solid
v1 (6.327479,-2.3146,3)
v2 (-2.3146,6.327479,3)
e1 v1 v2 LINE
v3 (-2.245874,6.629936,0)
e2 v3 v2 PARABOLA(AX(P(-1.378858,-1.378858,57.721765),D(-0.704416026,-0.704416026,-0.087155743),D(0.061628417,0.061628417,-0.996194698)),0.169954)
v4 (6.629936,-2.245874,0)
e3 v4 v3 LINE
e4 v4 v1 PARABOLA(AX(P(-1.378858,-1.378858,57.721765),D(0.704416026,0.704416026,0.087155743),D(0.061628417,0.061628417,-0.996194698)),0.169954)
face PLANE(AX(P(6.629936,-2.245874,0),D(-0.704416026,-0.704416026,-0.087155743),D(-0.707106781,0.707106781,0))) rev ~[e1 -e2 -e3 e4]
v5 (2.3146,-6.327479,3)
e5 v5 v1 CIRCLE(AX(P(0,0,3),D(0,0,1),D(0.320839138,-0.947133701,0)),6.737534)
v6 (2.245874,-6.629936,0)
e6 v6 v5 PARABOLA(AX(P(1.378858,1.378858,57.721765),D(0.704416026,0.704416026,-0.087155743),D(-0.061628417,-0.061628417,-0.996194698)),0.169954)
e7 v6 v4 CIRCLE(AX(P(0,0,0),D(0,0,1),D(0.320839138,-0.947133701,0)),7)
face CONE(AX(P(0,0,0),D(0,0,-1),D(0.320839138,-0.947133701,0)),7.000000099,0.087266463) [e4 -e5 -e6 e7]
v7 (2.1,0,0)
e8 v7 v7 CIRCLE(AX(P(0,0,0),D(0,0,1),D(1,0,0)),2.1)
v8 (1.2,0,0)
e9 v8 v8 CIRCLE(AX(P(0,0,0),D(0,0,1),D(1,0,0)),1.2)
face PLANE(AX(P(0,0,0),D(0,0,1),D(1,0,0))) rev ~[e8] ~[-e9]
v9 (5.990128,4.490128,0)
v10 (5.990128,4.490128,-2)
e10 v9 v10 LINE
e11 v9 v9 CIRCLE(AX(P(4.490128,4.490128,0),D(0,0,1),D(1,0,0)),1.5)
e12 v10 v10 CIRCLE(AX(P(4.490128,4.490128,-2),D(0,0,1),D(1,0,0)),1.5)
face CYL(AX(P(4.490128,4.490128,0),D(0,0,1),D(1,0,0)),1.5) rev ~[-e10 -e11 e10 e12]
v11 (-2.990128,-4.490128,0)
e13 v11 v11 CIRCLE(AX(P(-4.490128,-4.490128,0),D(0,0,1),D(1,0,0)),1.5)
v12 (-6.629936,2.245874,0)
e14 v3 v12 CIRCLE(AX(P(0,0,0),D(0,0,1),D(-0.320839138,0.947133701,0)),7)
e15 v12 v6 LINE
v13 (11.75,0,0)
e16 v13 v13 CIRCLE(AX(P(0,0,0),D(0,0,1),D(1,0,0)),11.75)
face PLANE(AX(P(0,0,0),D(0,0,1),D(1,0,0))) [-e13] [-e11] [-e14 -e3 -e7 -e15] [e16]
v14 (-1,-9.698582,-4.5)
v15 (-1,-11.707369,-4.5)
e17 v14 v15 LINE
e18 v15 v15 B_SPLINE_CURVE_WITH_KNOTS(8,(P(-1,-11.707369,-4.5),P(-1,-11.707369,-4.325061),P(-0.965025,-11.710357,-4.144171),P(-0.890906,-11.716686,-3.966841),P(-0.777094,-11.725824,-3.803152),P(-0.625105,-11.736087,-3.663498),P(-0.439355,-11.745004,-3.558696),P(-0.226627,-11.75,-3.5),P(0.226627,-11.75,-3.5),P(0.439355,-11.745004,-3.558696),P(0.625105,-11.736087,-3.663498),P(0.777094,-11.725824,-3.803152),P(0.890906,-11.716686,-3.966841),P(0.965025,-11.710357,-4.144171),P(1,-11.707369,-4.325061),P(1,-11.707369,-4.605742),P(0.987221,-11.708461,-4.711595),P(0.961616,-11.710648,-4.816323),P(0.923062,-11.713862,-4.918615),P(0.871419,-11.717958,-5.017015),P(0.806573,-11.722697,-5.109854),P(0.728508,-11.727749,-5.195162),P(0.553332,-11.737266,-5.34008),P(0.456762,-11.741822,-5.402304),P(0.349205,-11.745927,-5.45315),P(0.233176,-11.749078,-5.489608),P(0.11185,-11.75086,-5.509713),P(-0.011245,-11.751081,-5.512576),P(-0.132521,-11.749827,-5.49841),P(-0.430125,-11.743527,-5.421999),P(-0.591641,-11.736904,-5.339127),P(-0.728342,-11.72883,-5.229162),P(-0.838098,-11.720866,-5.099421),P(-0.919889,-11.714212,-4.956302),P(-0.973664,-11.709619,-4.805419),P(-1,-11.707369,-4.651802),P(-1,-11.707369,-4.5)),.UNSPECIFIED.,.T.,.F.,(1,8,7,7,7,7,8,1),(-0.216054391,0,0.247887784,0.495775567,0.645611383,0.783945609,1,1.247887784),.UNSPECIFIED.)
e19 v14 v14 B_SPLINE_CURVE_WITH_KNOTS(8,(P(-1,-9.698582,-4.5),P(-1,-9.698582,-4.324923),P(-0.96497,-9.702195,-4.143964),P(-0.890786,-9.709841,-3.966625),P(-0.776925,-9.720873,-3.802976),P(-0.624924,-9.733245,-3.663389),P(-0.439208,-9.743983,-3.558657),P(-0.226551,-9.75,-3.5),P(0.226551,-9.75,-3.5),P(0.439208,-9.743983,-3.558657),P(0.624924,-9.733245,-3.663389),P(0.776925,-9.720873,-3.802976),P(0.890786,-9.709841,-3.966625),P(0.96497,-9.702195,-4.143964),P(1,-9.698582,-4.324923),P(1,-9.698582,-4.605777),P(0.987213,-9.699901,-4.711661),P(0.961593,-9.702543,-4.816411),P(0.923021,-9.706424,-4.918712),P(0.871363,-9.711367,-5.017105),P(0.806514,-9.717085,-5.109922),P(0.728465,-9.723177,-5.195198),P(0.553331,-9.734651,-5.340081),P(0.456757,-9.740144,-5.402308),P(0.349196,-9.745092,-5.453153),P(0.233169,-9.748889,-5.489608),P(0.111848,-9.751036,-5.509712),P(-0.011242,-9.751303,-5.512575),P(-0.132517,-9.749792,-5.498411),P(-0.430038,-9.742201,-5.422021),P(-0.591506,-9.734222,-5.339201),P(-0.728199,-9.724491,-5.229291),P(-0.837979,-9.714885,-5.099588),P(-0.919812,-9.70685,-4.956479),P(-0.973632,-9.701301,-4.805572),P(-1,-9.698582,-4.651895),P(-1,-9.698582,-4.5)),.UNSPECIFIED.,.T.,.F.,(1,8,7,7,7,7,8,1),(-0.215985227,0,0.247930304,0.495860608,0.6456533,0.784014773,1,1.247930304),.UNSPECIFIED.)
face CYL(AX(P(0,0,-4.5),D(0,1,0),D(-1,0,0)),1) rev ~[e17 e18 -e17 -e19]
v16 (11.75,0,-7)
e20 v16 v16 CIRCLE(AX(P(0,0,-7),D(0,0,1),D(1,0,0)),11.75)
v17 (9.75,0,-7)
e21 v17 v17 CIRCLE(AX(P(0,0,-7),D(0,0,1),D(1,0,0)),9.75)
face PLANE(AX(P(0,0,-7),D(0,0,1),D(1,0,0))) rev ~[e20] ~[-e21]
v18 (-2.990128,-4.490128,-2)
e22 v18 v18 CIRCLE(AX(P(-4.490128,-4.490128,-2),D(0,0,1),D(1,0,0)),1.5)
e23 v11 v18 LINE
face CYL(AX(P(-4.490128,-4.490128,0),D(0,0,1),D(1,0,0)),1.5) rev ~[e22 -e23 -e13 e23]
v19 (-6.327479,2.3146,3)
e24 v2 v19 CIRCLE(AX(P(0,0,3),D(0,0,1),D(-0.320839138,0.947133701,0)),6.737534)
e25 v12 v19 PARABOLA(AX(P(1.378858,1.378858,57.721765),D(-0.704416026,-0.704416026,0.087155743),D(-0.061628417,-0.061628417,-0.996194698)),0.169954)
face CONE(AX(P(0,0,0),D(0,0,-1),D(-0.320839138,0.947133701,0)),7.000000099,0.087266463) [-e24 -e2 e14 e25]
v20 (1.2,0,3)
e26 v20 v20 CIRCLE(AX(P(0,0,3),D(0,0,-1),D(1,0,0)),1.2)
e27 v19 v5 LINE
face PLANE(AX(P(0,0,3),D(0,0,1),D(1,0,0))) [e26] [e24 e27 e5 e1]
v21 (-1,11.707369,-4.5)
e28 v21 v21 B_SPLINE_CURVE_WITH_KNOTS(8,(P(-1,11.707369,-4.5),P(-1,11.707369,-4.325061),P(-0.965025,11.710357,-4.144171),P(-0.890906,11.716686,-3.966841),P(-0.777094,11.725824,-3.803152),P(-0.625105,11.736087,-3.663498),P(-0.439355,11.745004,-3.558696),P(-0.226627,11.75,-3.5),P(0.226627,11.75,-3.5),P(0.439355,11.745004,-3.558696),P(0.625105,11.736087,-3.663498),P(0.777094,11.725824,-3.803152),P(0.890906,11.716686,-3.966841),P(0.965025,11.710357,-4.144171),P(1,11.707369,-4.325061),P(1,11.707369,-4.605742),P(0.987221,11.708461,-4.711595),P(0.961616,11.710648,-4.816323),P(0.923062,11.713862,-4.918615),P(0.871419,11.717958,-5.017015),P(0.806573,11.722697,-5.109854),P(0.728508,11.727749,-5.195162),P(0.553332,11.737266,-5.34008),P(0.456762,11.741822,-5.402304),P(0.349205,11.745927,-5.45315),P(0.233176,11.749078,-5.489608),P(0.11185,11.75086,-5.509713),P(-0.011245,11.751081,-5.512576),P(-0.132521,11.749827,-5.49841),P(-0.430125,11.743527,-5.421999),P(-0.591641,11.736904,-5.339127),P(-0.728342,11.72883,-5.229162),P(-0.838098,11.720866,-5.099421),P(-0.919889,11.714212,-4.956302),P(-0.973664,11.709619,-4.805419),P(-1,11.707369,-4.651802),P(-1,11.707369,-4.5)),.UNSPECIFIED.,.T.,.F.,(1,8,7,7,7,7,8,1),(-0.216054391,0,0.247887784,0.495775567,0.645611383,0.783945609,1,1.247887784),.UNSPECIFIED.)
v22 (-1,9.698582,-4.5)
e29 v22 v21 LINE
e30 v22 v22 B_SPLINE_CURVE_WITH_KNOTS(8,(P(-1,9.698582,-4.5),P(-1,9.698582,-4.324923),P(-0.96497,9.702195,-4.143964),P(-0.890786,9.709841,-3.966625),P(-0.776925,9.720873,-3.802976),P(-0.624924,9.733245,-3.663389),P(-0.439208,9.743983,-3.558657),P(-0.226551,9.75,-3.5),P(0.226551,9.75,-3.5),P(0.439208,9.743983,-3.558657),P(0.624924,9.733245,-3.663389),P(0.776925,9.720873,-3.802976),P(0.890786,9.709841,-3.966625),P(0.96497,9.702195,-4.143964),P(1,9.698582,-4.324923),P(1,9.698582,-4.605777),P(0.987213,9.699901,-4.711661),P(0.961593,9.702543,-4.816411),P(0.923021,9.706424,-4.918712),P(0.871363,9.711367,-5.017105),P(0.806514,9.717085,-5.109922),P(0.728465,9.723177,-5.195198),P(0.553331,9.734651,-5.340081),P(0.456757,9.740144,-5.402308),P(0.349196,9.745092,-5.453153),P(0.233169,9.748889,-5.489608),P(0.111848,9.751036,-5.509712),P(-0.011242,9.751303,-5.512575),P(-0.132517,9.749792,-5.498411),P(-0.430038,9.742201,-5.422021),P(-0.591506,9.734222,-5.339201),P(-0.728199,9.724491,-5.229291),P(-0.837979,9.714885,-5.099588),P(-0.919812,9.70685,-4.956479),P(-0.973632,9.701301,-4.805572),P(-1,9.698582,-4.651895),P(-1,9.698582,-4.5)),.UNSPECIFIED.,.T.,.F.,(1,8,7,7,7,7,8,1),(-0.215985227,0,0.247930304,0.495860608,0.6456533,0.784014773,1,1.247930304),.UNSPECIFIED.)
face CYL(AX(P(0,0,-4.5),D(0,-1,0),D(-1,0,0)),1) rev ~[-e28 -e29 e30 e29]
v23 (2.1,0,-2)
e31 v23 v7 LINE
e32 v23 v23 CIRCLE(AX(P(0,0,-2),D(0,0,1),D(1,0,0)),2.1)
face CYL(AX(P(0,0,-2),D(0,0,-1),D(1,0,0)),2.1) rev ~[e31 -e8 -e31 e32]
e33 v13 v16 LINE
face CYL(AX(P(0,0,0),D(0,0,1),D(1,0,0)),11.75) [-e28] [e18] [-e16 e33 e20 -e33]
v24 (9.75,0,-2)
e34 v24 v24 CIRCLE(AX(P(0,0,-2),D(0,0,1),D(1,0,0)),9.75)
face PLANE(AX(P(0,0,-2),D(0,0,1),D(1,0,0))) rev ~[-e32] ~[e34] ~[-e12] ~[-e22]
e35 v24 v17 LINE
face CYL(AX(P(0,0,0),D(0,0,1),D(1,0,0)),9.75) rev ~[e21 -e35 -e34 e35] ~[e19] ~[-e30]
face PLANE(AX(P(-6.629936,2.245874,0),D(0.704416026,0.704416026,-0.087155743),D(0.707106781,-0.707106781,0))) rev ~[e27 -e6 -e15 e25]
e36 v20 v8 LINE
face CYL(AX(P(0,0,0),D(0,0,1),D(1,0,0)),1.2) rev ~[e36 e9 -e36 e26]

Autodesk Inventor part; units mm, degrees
ref_plane "YZ Plane" through (0, 0, 0) normal (1, 0, 0) x (0, 1, 0)
ref_plane "XZ Plane" through (0, 0, 0) normal (0, 1, 0) x (-1, 0, 0)
ref_plane "XY Plane" through (0, 0, 0) normal (0, 0, 1) x (1, 0, 0)
sketch "Skizze1" plane through (0, 0, 0) normal (0, 0, 1) x (1, 0, 0)
  circle A0 centre (0, 0) radius 9.75
  line L0 (0, 16.45) -> (0, -16.45) construction
  line L1 (-16.45, 0) -> (16.45, 0) construction
  circle A1 centre (4.490128, 4.490128) radius 1.5
  circle A2 centre (0, 0) radius 6.35 construction
  circle A3 centre (-4.490128, -4.490128) radius 1.5
  circle A4 centre (0, 0) radius 11.75
  line L2 (4.490128, 4.490128) -> (0, 0) construction
  circle A5 centre (0, 0) radius 2.1
  circle A6 centre (0, 0) radius 1.2
  arc A7 (2.245874, -6.629936) -> (6.629936, -2.245874) centre (0, 0) ccw
  line L3 (6.629936, -2.245874) -> (-2.245874, 6.629936)
  line L4 (-6.629936, 2.245874) -> (2.245874, -6.629936)
  arc A8 (-2.245874, 6.629936) -> (-6.629936, 2.245874) centre (0, 0) ccw
  arc A9 (-2.245874, 6.629936) -> (-6.629936, 2.245874) centre (0, 0) ccw
  line L5 (0, 0) -> (4.949747, -4.949747) construction
  point P0 (0, -7)
  dimension "d3" = 6.35
  dimension "d0" = 19.5
  dimension "d1" = 3
  dimension "d6" = 360
  dimension "d8" = 2
  dimension "d17" = 45
  dimension "d21" = 4.2
  dimension "d24" = 2.4
  dimension "d76" = 7
  dimension "d122" = 6.2
extrude "Extrusion1" add sketch "Skizze1" against normal blind 7 contours A4
extrude "Extrusion2" add sketch "Skizze1" against normal blind 2 contours A0 | A4 | A5 | A6 | L4 A8 L3 A7
sketch "Skizze2" plane through (0, 0, 0) normal (0, 1, 0) x (-1, 0, 0)
  circle A0 centre (0, -4.5) radius 1
  line L0 (-9.75, 0) -> (9.75, 0) projected
  point P0 (0, 0)
  dimension "d13" = 2
  dimension "d14" = 4.5
extrude "Extrusion3" cut sketch "Skizze2" along normal through all both and the other way through all
sketch "Skizze1 outline for Extrusion4" plane through (0, 0, 0) normal (0, 0, 1) x (1, 0, 0)
  arc A0 (2.245874, -6.629936) -> (6.629936, -2.245874) centre (0, 0) ccw
  line L0 (-6.629936, 2.245874) -> (2.245874, -6.629936)
  arc A1 (-2.245874, 6.629936) -> (-6.629936, 2.245874) centre (0, 0) ccw
  line L1 (6.629936, -2.245874) -> (-2.245874, 6.629936)
extrude "Extrusion4" add sketch "Skizze1 outline for Extrusion4" along normal blind 3 draft -5
extrude "Extrusion6" cut sketch "Skizze1" along normal through all both and the other way through all contours A6
extrude "Extrusion7" cut sketch "Skizze1" along normal blind 2 from surface at -2 contours A5
properties part number "InputMountingHub"
